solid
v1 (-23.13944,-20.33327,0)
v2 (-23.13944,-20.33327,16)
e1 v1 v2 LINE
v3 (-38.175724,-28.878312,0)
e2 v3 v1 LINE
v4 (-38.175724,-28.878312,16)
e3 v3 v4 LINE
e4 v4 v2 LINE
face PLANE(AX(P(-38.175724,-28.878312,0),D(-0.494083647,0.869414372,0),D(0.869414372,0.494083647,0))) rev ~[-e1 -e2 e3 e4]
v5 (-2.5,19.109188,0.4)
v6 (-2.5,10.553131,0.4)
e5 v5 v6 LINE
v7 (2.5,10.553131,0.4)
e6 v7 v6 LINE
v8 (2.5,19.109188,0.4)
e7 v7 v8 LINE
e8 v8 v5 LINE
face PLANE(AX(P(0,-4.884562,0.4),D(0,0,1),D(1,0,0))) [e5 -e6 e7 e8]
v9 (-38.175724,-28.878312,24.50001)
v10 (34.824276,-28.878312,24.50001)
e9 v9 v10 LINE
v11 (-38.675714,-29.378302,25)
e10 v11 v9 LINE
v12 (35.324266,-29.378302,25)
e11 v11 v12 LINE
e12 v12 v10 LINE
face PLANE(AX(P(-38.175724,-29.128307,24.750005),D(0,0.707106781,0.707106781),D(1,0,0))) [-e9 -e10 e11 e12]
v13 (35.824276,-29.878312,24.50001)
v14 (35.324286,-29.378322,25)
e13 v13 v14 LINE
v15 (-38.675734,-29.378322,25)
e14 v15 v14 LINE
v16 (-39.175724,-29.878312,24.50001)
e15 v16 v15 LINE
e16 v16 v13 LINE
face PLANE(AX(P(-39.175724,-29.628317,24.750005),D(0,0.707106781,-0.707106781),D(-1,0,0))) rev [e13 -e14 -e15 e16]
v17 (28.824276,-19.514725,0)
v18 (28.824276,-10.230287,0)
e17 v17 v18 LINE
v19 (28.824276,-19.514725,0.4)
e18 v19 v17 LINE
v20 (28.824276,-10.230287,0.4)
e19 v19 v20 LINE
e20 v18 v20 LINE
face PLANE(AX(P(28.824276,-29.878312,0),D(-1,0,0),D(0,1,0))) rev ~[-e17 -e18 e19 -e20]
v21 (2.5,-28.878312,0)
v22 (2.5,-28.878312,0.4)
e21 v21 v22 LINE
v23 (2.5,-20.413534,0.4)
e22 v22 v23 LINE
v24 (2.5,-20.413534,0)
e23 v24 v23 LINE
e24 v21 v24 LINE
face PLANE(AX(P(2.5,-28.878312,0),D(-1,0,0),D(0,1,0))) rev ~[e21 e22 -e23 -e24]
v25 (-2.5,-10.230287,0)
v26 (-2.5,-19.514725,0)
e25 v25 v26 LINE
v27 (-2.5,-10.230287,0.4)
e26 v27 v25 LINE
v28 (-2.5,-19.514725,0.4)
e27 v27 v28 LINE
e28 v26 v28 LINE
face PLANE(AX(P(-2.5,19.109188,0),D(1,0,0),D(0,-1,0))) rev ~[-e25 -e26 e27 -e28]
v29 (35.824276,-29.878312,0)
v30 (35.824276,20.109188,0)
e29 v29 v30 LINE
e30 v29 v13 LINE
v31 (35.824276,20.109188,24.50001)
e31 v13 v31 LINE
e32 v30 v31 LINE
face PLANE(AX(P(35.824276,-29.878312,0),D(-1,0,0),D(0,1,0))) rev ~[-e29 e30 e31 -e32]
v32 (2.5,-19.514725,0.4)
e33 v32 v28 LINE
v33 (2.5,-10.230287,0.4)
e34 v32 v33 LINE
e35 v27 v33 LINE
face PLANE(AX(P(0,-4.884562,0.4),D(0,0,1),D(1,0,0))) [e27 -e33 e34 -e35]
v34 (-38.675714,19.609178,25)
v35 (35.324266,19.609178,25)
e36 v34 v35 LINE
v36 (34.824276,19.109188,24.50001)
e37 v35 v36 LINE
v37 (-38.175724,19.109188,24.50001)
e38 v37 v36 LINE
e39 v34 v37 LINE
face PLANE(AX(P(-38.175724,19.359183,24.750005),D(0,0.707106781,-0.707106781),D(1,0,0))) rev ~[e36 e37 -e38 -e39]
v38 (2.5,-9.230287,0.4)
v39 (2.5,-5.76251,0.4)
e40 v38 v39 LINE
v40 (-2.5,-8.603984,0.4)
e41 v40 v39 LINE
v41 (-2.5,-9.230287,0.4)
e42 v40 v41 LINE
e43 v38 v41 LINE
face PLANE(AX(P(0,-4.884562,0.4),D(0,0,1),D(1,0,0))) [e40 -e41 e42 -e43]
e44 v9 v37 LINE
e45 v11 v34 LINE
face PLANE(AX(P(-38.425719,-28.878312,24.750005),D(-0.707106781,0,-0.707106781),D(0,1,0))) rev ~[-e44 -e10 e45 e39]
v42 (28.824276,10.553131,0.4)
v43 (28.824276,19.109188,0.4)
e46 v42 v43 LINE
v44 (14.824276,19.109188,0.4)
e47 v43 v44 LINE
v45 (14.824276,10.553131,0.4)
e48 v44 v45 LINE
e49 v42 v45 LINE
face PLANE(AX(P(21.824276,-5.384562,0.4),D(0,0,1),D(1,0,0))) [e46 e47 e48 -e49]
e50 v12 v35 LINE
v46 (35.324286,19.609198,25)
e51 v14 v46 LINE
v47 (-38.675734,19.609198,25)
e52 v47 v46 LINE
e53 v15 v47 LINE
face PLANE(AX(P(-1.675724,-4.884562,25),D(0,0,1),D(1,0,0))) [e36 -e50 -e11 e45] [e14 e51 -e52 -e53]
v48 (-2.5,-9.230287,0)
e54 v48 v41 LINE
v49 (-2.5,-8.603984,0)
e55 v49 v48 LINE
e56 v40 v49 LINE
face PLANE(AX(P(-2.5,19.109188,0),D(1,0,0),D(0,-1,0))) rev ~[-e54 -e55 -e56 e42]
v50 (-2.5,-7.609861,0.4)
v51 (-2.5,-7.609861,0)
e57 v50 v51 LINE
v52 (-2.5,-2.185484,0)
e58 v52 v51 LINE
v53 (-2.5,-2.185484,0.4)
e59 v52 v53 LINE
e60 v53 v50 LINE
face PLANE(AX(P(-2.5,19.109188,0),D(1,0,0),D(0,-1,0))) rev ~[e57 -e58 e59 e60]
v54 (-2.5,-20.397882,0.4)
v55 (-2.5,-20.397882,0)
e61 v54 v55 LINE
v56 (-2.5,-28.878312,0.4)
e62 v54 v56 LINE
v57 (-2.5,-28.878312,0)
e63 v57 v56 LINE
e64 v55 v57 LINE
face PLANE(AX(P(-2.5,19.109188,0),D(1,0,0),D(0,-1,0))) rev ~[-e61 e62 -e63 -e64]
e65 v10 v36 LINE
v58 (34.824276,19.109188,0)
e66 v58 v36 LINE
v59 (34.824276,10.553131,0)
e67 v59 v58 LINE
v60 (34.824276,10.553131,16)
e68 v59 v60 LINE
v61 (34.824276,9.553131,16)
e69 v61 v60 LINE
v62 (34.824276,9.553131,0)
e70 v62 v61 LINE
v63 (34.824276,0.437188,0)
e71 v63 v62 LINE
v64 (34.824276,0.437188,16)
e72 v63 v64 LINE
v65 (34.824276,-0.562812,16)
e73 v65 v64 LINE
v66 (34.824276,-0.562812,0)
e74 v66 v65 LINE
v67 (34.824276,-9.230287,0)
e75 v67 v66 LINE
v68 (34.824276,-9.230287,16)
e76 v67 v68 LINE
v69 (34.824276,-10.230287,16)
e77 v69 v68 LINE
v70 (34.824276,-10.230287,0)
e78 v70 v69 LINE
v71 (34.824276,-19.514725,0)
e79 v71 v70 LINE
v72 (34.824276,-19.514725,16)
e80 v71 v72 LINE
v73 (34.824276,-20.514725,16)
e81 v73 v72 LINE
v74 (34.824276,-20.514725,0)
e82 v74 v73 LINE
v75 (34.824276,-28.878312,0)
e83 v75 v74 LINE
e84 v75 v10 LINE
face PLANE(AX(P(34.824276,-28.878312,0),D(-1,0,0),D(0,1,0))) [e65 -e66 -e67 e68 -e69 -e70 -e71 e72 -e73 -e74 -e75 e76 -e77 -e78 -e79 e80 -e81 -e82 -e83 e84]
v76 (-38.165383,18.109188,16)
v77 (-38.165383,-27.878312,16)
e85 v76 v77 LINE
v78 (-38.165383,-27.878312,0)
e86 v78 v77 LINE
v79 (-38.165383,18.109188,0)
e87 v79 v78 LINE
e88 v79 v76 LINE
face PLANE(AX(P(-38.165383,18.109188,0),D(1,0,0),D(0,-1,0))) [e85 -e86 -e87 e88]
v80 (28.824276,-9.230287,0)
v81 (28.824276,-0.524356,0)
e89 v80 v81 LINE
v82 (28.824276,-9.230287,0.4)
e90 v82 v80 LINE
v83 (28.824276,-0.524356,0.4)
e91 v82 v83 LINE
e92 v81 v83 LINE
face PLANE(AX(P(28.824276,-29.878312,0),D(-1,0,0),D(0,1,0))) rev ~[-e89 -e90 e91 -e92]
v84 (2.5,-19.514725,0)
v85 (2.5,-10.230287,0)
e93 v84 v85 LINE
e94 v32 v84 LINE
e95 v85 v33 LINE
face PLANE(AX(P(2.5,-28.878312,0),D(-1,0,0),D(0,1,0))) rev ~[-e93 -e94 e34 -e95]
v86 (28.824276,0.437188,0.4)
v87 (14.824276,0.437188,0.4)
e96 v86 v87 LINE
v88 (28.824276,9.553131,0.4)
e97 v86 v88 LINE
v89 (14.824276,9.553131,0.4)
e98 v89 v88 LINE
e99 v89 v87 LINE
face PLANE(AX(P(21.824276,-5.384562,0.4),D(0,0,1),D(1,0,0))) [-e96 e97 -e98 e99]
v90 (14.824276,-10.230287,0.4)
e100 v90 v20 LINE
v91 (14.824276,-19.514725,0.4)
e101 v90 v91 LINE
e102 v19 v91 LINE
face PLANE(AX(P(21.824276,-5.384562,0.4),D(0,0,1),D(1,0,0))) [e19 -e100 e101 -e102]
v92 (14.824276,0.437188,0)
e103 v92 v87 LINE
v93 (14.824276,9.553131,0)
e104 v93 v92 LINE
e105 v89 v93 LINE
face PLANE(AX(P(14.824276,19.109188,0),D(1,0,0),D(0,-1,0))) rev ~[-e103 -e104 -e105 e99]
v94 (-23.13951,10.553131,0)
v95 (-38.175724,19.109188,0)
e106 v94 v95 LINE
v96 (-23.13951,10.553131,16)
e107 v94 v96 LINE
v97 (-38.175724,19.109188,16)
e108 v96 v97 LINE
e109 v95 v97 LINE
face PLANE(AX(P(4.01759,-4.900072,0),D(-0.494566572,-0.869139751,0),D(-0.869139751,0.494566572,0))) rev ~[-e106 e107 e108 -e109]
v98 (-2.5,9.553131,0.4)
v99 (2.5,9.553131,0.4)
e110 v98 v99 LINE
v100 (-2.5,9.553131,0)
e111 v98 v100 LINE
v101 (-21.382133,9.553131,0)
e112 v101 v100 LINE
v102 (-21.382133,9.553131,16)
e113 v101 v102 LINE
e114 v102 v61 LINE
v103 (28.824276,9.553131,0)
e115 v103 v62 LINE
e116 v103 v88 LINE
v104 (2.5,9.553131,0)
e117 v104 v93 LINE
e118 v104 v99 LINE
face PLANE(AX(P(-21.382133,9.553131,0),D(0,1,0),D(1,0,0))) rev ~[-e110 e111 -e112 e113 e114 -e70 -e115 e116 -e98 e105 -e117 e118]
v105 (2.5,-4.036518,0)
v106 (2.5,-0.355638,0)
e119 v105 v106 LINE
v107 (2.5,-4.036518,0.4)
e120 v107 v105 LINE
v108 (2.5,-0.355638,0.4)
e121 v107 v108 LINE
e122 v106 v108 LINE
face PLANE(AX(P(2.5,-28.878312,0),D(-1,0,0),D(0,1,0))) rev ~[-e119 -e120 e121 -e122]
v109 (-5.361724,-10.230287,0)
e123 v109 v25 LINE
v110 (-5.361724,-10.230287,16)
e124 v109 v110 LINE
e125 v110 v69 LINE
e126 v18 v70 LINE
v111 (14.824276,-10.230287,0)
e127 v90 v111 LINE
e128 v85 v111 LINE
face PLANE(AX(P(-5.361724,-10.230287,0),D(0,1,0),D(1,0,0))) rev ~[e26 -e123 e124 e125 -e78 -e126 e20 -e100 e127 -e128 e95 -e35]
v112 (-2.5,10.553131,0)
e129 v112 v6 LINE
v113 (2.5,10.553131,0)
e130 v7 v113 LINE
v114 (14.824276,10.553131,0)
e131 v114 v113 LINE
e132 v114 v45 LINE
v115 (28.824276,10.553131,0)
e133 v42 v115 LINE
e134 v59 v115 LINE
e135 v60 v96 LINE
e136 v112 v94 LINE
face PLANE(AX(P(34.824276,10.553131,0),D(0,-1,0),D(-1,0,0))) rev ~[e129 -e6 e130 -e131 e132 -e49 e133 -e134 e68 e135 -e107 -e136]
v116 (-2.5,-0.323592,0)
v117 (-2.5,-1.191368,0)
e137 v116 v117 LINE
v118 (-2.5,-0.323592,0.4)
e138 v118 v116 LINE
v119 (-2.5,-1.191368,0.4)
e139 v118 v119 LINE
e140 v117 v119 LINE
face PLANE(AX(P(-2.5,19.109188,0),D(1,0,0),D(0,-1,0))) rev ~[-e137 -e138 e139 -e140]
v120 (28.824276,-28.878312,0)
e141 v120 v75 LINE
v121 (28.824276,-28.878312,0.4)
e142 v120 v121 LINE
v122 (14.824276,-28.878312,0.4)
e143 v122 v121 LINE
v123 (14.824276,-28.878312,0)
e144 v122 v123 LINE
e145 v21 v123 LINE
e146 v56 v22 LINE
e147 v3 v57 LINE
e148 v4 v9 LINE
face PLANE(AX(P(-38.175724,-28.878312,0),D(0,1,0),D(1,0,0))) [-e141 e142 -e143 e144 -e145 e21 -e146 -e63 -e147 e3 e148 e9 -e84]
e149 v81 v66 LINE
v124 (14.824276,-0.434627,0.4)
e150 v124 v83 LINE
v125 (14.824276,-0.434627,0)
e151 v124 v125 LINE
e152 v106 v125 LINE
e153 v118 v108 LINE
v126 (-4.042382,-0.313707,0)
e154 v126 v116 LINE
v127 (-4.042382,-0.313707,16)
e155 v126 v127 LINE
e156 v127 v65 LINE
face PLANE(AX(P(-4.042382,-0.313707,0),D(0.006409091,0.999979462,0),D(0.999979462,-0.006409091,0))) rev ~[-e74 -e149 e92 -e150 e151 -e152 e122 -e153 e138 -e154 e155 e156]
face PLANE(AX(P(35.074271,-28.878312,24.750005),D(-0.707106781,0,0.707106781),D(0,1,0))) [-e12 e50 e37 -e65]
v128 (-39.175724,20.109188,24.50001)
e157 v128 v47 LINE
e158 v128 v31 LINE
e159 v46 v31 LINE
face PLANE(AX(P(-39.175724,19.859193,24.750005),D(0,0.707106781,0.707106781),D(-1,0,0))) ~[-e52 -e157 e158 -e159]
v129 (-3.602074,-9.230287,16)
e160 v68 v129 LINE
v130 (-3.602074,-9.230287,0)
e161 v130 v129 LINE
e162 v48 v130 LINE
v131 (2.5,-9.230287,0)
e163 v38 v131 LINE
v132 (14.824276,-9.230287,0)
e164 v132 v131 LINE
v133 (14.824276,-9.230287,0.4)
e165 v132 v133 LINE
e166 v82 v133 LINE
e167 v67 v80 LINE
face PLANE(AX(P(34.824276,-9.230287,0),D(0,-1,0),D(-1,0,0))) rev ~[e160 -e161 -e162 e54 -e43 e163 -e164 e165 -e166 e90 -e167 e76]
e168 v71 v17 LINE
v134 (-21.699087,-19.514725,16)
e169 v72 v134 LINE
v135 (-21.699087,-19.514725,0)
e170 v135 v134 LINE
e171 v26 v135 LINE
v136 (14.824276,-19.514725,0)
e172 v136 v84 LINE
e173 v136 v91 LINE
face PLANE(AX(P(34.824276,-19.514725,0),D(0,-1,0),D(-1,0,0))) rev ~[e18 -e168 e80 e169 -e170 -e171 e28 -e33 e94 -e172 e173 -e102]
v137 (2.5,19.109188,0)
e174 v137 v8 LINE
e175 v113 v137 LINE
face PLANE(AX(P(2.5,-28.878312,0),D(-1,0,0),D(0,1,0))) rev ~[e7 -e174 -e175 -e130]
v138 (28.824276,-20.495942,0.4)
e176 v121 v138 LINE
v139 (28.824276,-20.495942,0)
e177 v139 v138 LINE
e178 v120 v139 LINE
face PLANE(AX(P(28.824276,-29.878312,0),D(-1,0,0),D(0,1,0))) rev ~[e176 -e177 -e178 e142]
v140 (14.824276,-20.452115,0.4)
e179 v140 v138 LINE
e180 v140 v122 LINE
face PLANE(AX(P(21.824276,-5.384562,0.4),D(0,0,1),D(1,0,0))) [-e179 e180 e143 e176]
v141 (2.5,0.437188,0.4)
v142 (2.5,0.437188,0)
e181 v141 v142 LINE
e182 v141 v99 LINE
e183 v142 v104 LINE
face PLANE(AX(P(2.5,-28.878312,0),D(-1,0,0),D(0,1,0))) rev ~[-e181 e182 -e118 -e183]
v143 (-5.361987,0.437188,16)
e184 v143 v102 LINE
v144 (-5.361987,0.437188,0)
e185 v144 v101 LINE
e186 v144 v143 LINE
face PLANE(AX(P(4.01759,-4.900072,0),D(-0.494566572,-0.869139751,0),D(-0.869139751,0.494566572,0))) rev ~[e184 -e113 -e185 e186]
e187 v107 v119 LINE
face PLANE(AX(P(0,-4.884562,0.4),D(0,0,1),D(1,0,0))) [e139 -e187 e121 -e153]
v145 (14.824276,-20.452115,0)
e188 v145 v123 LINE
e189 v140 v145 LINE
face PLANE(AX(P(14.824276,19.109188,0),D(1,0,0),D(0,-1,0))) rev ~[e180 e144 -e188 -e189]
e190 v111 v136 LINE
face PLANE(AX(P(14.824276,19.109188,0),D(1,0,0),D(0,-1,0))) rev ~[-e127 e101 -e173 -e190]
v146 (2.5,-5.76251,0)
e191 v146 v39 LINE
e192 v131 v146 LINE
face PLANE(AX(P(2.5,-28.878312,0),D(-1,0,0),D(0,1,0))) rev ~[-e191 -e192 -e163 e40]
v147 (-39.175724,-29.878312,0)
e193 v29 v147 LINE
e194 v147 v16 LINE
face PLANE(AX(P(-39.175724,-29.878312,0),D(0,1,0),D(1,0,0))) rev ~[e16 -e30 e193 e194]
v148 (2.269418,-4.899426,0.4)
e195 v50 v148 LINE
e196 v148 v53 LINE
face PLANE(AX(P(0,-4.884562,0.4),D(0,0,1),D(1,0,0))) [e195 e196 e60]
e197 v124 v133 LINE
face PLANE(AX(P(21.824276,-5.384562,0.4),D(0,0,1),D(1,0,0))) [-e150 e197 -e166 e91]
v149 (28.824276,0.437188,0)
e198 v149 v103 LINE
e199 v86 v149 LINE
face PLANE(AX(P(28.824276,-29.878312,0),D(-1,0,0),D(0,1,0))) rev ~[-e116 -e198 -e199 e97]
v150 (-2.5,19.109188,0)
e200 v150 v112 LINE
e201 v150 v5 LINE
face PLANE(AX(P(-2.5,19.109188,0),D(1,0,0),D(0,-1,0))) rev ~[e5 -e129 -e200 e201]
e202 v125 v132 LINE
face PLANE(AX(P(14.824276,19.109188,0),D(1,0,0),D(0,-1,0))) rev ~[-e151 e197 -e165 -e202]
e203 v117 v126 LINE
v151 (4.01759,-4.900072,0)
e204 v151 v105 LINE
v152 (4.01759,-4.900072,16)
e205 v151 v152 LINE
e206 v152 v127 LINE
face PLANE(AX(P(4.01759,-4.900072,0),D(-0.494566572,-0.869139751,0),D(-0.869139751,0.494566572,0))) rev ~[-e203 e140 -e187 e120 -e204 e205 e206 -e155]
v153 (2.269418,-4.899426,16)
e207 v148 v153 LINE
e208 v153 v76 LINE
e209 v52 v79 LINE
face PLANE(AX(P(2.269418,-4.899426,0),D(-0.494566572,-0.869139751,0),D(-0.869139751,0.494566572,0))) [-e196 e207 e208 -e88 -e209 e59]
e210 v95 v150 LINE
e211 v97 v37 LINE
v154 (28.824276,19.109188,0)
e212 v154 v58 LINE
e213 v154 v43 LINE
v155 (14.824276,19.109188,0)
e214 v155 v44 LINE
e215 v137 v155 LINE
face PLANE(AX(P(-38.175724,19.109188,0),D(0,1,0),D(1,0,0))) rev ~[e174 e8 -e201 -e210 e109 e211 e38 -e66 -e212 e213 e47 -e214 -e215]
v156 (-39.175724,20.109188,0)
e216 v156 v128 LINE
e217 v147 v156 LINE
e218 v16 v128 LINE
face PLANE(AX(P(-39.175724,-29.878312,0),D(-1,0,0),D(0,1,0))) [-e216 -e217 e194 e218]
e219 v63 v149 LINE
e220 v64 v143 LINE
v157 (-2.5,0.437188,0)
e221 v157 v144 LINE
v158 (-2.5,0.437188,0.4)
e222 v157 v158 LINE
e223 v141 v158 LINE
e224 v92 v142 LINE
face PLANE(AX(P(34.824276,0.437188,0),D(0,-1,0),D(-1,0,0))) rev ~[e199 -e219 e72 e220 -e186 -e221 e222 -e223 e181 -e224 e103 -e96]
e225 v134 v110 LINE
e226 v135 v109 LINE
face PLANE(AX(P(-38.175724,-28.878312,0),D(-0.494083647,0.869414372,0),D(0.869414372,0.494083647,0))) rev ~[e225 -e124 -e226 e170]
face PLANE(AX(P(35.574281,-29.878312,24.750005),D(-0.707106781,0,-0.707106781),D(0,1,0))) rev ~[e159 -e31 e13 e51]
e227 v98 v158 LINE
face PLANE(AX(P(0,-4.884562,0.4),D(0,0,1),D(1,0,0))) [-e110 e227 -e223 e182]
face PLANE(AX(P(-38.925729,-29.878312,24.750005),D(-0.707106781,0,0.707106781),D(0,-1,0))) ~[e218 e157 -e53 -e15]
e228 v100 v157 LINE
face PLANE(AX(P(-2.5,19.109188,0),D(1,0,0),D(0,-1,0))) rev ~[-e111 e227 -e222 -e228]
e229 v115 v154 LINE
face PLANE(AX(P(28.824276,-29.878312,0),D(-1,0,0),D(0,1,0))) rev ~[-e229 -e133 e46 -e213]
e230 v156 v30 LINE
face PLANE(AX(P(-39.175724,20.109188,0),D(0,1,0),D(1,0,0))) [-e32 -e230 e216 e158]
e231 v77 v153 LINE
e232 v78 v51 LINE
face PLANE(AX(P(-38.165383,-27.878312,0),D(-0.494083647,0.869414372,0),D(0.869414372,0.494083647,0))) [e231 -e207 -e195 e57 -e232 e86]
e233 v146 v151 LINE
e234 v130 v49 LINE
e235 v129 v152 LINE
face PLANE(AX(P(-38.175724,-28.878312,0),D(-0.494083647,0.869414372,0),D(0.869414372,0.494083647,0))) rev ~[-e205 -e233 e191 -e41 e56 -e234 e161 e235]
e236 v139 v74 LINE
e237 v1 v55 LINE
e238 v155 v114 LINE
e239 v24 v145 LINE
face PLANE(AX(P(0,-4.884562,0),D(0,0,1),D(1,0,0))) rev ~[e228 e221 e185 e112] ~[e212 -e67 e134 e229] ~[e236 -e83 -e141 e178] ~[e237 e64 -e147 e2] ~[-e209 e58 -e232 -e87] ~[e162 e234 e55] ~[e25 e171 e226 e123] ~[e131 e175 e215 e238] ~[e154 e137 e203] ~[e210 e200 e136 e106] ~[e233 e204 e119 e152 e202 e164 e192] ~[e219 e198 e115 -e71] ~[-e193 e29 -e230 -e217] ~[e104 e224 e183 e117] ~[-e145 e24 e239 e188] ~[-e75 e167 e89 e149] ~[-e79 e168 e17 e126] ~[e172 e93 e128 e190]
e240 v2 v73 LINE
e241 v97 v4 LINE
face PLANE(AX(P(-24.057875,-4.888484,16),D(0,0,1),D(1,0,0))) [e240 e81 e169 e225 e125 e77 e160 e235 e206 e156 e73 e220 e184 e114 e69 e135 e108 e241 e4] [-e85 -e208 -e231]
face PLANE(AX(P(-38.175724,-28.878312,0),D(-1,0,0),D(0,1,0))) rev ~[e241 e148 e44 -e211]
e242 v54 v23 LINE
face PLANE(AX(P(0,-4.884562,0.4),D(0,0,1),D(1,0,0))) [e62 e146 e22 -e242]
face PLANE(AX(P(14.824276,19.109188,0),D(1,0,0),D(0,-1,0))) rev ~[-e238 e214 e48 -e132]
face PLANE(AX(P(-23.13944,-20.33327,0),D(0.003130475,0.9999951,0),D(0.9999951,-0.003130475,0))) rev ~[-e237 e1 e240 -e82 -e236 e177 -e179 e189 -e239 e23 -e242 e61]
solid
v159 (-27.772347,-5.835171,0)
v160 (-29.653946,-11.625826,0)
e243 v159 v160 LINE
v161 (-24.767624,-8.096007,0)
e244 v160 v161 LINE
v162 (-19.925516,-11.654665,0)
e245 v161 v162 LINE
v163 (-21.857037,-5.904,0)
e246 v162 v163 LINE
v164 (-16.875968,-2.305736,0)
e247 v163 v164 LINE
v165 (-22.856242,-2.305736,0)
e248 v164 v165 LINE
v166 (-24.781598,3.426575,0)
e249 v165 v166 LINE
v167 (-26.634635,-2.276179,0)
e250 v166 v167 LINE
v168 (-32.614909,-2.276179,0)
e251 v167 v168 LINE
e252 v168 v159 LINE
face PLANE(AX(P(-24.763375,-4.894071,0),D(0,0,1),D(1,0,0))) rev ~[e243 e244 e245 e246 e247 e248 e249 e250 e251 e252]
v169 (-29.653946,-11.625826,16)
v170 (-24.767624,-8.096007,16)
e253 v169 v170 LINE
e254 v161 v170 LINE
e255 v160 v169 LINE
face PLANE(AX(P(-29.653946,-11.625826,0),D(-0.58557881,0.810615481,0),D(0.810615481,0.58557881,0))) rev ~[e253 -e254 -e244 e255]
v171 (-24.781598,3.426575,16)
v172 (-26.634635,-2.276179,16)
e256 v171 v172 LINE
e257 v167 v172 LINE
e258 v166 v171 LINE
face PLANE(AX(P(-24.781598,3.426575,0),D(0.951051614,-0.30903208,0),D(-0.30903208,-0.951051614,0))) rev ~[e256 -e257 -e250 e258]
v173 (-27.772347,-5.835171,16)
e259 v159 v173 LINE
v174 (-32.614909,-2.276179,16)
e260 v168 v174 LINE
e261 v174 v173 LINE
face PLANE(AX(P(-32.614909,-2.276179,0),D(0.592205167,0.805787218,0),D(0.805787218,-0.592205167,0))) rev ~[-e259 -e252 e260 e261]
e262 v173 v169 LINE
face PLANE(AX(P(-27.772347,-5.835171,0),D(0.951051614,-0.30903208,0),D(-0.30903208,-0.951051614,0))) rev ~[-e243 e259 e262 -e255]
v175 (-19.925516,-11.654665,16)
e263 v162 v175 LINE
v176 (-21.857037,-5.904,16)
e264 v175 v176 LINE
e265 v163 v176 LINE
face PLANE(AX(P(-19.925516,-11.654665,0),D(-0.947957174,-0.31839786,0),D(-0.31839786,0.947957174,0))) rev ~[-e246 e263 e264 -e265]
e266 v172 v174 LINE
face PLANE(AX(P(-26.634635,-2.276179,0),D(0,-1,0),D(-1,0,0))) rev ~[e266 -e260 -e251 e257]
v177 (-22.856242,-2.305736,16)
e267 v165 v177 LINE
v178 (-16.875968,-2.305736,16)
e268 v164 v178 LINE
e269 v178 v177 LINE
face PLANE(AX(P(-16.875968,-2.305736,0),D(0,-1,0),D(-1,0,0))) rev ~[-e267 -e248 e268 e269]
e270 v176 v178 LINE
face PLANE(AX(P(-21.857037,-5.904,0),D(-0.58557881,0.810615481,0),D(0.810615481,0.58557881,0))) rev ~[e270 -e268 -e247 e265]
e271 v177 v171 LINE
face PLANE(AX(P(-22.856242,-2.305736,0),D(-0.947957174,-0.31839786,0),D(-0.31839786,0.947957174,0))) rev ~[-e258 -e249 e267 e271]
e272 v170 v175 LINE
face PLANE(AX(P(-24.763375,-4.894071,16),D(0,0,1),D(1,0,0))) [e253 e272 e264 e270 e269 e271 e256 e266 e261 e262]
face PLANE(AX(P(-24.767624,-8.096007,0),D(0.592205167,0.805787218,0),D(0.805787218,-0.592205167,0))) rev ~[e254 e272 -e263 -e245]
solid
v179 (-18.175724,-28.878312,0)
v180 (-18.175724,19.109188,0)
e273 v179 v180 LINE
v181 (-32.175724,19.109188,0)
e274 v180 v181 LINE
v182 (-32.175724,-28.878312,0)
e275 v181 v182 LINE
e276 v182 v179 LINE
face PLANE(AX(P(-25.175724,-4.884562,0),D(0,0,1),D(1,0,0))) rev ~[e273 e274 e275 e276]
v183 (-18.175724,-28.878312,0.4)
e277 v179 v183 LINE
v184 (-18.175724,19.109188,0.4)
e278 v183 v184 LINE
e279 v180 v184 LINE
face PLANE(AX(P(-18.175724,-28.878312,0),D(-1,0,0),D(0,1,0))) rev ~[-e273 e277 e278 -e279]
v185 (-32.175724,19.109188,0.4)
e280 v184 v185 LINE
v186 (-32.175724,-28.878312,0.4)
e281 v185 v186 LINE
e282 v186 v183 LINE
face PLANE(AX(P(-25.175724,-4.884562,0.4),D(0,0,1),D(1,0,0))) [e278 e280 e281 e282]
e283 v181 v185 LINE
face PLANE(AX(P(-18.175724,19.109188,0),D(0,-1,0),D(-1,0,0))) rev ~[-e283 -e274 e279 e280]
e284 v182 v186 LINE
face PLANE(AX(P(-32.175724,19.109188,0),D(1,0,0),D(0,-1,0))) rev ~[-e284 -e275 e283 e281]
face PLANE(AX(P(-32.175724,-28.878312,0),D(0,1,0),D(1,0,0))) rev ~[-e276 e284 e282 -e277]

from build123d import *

# Parameters (mm, degrees)
F1_W      = 75
F1_H      = 49.9875
F2_DEPTH  = 25
F3_W      = 73
F3_H      = 47.9875
F4_DEPTH  = 25
F5_SIZE2  = 0.49999
F5_SIZE   = 0.49999
F7_DEPTH  = 16
F9_DEPTH  = 16
F11_DEPTH = 16
F13_DEPTH = 16
F15_DEPTH = 16
F17_DEPTH = 16
F19_DEPTH = 16
F21_DEPTH = 0.4
F23_DEPTH = 0.4
F25_DEPTH = 0.4


# Not quite as in the source:
# - a fillet or chamfer is up to 0.001 mm smaller than in the source, because OpenCascade refuses the exact size


with BuildPart() as f2:
    # F1 (on Top) → F2 (new body)
    with BuildSketch(Plane.XY):
        with Locations((-1.6757239815, -4.8845620042)):
            Rectangle(F1_W, F1_H)
    extrude(amount=F2_DEPTH)

    # F3 (on Top) → F4 (cut)
    with BuildSketch(Plane.XY):
        with Locations((-1.6757239815, -4.8845620042)):
            Rectangle(F3_W, F3_H)
    extrude(amount=F4_DEPTH, mode=Mode.SUBTRACT)

    # F5 (size 0.5 and 0.5 in the source; OpenCascade refuses exactly that, so slightly less here)
    f5_edges = [f2.edges().sort_by_distance(p)[0] for p in [
        (-1.675724, -29.878312, 25),
        (-39.175724, -4.884562, 25),
        (35.824276, -4.884562, 25),
        (-1.675724, 20.109188, 25),
        (-1.675724, -28.878312, 25),
        (34.824276, -4.884562, 25),
        (-1.675724, 19.109188, 25),
        (-38.175724, -4.884562, 25),
    ]]
    chamfer(f5_edges, length=F5_SIZE, length2=F5_SIZE2)

    # F6 (on Top) → F7 (join)
    with BuildSketch(Plane.XY):
        Polygon((4.0175896138, -4.9000722356), (-38.1757239815, 19.1091879958), (-38.1757239815, -28.8783120042), align=None)
    extrude(amount=F7_DEPTH)

    # F8 (on Top) → F9 (cut)
    with BuildSketch(Plane.XY):
        Polygon((2.2694178753, -4.8994258076), (-38.1653830409, 18.1091879958), (-38.1653830409, -27.8783120042), align=None)
    extrude(amount=F9_DEPTH, mode=Mode.SUBTRACT)

    # F10 (on Top) → F11 (join)
    with BuildSketch(Plane.XY):
        Polygon((34.8242760185, 10.5531314617), (-23.1395099124, 10.5531314617), (-21.3821332507, 9.5531314617), (34.8242760185, 9.5531314617), align=None)
    extrude(amount=F11_DEPTH)

    # F12 (on Top) → F13 (join)
    with BuildSketch(Plane.XY):
        Polygon((34.8242760185, 0.4371882224), (-5.3619873524, 0.4371882224), (-4.0423821136, -0.3137067153), (34.8242760185, -0.5628117776), align=None)
    extrude(amount=F13_DEPTH)

    # F14 (on Top) → F15 (join)
    with BuildSketch(Plane.XY):
        Polygon((34.8242760185, -9.2302871699), (-3.6020738153, -9.2302871699), (-5.3617239815, -10.2302871699), (34.8242760185, -10.2302871699), align=None)
    extrude(amount=F15_DEPTH)

    # F16 (on Top) → F17 (join)
    with BuildSketch(Plane.XY):
        Polygon((-21.6990868828, -19.5147251875), (-23.1394399608, -20.3332703197), (34.8242760185, -20.5147251875), (34.8242760185, -19.5147251875), align=None)
    extrude(amount=F17_DEPTH)

    # F22 (on Top) → F23 (join)
    with BuildSketch(Plane.XY):
        Polygon((28.8242760185, 19.1091879958), (14.8242760185, 19.1091879958), (14.8242760185, -29.8783120042), (28.8242760185, -29.8783120042), (28.8242760185, 4.2719491757), align=None)
    extrude(amount=F23_DEPTH)

    # F24 (on Top) → F25 (join)
    with BuildSketch(Plane.XY):
        Polygon((2.5, 19.1091879958), (-2.5, 19.1091879958), (-2.5, -28.8783120042), (2.5, -28.8783120042), (2.5, 7.0442273282), align=None)
    extrude(amount=F25_DEPTH)


with BuildPart() as f19:
    # F18 (on Top) → F19 (new body)
    with BuildSketch(Plane.XY):
        Polygon((-22.8562415051, -2.3057359916), (-24.7815981912, 3.4265754099), (-26.6346354038, -2.2761789151), (-32.6149091125, -2.2761789151), (-27.7723465115, -5.8351713233), (-29.6539459378, -11.6258263588), (-24.7676242143, -8.0960066989), (-19.9255160506, -11.6546651231), (-21.8570372557, -5.9040002689), (-16.8759677964, -2.3057359916), align=None)
    extrude(amount=F19_DEPTH)


with BuildPart() as f21:
    # F20 (on Top) → F21 (new body)
    with BuildSketch(Plane.XY):
        Polygon((-18.1757239815, 19.1091879958), (-32.1757239815, 19.1091879958), (-32.1757239815, 8.0351457), (-32.1757239815, -28.8783120042), (-18.1757239815, -28.8783120042), align=None)
    extrude(amount=F21_DEPTH)


solid = Compound([f2.part, f19.part, f21.part])
